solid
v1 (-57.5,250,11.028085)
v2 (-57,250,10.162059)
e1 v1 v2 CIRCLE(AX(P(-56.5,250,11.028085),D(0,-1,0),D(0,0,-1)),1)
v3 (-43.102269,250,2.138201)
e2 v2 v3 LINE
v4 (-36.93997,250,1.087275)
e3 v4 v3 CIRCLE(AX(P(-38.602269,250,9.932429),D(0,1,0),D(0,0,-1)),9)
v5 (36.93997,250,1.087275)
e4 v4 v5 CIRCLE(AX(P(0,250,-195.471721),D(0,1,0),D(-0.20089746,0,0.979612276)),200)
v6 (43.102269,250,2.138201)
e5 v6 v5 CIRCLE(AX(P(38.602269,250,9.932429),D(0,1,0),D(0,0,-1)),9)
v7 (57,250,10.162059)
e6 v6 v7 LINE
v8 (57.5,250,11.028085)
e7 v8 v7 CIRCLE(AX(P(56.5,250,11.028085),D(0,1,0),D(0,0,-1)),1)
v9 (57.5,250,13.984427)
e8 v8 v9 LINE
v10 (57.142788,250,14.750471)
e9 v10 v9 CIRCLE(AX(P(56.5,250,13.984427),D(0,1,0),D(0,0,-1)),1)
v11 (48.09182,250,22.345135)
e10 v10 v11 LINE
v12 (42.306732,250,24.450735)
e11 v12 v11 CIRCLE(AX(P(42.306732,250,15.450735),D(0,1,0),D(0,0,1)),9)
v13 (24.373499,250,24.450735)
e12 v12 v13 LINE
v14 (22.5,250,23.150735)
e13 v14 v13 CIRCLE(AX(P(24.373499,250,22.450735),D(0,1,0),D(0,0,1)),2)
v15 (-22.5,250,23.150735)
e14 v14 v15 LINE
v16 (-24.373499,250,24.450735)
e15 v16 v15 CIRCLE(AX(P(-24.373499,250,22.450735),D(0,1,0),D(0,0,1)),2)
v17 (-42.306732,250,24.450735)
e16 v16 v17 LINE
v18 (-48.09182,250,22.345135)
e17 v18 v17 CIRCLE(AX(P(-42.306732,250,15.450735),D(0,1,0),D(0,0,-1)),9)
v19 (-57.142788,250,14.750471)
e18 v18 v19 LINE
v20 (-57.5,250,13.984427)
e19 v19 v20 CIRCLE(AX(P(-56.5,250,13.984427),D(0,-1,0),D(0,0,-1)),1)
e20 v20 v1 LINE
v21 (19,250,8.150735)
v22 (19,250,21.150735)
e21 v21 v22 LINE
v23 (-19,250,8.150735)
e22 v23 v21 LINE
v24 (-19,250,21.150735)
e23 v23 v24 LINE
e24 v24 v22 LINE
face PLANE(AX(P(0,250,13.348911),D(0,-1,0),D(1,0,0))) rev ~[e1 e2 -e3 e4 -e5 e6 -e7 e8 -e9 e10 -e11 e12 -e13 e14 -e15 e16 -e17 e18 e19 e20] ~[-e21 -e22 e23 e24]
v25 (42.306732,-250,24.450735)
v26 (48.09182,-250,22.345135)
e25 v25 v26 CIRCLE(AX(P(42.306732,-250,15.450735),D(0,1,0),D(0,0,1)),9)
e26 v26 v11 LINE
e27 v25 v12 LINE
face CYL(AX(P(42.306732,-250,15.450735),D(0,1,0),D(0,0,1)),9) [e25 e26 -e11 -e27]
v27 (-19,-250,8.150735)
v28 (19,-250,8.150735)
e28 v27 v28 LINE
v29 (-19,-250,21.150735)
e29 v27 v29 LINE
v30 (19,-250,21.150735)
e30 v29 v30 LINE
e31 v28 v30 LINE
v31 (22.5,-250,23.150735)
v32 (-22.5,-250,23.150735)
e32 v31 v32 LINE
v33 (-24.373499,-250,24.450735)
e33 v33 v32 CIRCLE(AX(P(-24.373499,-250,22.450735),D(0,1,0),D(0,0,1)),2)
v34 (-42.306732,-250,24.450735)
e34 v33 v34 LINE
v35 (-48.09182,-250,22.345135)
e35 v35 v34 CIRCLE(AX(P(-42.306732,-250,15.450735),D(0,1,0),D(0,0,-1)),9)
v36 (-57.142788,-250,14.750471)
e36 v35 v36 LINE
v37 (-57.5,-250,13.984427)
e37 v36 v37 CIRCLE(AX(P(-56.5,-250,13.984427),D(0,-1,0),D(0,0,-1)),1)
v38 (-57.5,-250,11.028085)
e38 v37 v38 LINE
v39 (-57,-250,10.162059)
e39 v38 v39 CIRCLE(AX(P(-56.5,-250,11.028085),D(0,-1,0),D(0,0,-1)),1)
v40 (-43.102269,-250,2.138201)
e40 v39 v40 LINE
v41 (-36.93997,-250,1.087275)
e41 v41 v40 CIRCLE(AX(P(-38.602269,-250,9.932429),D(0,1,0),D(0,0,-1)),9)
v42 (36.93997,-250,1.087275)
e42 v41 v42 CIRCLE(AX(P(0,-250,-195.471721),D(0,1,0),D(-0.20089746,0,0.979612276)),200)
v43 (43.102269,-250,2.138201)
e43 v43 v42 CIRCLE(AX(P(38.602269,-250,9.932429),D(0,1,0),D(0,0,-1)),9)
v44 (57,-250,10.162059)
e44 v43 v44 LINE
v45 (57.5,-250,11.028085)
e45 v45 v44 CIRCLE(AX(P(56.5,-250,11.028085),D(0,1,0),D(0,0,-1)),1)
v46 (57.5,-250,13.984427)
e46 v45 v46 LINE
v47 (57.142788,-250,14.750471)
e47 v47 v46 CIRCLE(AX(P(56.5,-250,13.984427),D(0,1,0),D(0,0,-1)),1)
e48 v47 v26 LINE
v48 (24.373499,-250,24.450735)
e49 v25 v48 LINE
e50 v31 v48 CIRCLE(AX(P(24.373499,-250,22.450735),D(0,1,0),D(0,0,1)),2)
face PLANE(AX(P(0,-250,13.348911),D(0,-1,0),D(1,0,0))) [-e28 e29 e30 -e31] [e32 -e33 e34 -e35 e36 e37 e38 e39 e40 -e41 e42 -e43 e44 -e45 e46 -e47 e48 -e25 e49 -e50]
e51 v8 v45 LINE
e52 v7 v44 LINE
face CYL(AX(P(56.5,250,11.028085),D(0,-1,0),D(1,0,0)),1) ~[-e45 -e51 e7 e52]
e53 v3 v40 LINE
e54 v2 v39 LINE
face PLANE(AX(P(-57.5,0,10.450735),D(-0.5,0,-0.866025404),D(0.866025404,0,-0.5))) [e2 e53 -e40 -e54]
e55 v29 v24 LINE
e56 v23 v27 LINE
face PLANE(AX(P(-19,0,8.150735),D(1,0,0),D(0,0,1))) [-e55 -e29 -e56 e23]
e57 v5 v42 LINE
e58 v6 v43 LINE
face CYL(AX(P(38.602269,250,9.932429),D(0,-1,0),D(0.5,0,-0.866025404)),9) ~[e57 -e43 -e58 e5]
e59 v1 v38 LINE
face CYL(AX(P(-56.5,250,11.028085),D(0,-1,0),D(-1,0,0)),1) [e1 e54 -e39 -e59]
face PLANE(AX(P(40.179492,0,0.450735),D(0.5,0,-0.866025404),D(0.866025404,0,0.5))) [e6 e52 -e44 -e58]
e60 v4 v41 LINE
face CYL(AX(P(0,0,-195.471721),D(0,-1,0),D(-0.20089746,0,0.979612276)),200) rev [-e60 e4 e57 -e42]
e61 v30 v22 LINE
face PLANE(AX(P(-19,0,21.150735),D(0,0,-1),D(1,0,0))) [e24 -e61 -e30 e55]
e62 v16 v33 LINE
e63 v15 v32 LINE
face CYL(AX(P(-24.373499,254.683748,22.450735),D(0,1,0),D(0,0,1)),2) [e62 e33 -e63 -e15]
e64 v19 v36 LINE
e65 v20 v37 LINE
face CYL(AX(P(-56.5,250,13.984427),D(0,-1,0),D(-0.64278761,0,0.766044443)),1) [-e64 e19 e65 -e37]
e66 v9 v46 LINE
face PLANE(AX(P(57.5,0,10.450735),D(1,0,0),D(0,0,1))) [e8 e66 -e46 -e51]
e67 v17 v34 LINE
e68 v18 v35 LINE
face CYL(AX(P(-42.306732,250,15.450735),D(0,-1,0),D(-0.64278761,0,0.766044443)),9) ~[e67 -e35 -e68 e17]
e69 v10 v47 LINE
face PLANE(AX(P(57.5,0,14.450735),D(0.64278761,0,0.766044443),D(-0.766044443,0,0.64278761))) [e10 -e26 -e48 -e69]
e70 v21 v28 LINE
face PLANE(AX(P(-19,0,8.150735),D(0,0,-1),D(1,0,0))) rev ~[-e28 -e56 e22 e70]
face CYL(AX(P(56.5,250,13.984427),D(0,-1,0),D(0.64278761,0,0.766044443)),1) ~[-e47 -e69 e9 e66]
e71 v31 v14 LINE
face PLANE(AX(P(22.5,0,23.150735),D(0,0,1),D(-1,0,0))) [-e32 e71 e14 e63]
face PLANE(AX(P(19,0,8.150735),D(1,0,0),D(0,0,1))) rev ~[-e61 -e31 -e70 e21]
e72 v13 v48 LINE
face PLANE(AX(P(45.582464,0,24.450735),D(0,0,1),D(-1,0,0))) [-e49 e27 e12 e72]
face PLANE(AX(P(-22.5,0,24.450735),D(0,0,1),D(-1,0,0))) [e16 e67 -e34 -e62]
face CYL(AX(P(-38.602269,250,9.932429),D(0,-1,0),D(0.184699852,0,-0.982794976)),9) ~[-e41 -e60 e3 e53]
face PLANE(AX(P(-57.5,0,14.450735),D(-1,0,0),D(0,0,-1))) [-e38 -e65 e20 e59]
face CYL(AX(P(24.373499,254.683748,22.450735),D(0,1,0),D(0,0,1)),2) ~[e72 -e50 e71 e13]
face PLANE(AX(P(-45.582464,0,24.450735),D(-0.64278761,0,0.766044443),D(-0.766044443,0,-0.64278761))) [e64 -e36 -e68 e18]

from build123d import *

# Parameters (mm, degrees)
F1_DEPTH    = 250
F2_W        = 38
F2_H        = 13
F3_DEPTH    = 250
F4_T1_DEPTH = 509.3674969976
F5_R        = 9
F6_R        = 1


# Not quite as in the source:
# - a fillet or chamfer that OpenCascade refuses, or shapes differently, is made with other operations: its cross-section is extruded or revolved along the edge and cut away or added


with BuildPart() as f1:
    # F0 (on Front) → F1 (new body, symmetric)
    with BuildSketch(Plane.XZ):
        with BuildLine():
            Line((22.5, 23.1507345177), (0, 23.1507345177))
            Line((0, 23.1507345177), (-22.5, 23.1507345177))
            Line((-22.5, 23.1507345177), (-22.5, 24.4507345177))
            Line((-22.5, 24.4507345177), (-45.5824640741, 24.4507345177))
            Line((-45.5824640741, 24.4507345177), (-57.5, 14.4507345177))
            Line((-57.5, 14.4507345177), (-57.5, 10.4507345177))
            Line((-57.5, 10.4507345177), (-40.1794919243, 0.4507345177))
            ThreePointArc((-40.1794919243, 0.4507345177), (0, 4.5282793762), (40.1794919243, 0.4507345177))
            Line((40.1794919243, 0.4507345177), (57.5, 10.4507345177))
            Line((57.5, 10.4507345177), (57.5, 14.4507345177))
            Line((57.5, 14.4507345177), (45.5824640741, 24.4507345177))
            Line((45.5824640741, 24.4507345177), (22.5, 24.4507345177))
            Line((22.5, 24.4507345177), (22.5, 23.1507345177))
        make_face()
    extrude(amount=F1_DEPTH, both=True)

    # F2 (on Front) → F3 (cut, symmetric)
    with BuildSketch(Plane.XZ):
        with Locations((0, 14.6507345177)):
            Rectangle(F2_W, F2_H)
    extrude(amount=F3_DEPTH, both=True, mode=Mode.SUBTRACT)

    # F4: fillet of radius 2 on 2 edges, made by hand

    # F4_s2 → F4_t1 (cut)
    with BuildSketch(Plane.XZ.offset(-254.6837484988)):
        with BuildLine():
            ThreePointArc((-24.3734993995, 24.4507345177), (-23.2333239744, 24.0939021903), (-22.5, 23.1507345177))
            Line((-22.5, 23.1507345177), (-22.5, 24.4507345177))
            Line((-22.5, 24.4507345177), (-24.3734993995, 24.4507345177))
        make_face()
        with BuildLine():
            ThreePointArc((24.3734993995, 24.4507345177), (23.2333239744, 24.0939021903), (22.5, 23.1507345177))
            Line((22.5, 23.1507345177), (22.5, 24.4507345177))
            Line((22.5, 24.4507345177), (24.3734993995, 24.4507345177))
        make_face()
    extrude(amount=F4_T1_DEPTH, mode=Mode.SUBTRACT)

    # F5
    f5_edges = [f1.edges().sort_by_distance(p)[0] for p in [
        (45.582464, 0, 24.450735),
        (40.179492, 0, 0.450735),
        (-45.582464, 0, 24.450735),
        (-40.179492, 0, 0.450735),
    ]]
    fillet(f5_edges, radius=F5_R)

    # F6
    f6_edges = [f1.edges().sort_by_distance(p)[0] for p in [
        (57.5, 0, 14.450735),
        (57.5, 0, 10.450735),
        (-57.5, 0, 14.450735),
        (-57.5, 0, 10.450735),
    ]]
    fillet(f6_edges, radius=F6_R)


solid = f1.part
